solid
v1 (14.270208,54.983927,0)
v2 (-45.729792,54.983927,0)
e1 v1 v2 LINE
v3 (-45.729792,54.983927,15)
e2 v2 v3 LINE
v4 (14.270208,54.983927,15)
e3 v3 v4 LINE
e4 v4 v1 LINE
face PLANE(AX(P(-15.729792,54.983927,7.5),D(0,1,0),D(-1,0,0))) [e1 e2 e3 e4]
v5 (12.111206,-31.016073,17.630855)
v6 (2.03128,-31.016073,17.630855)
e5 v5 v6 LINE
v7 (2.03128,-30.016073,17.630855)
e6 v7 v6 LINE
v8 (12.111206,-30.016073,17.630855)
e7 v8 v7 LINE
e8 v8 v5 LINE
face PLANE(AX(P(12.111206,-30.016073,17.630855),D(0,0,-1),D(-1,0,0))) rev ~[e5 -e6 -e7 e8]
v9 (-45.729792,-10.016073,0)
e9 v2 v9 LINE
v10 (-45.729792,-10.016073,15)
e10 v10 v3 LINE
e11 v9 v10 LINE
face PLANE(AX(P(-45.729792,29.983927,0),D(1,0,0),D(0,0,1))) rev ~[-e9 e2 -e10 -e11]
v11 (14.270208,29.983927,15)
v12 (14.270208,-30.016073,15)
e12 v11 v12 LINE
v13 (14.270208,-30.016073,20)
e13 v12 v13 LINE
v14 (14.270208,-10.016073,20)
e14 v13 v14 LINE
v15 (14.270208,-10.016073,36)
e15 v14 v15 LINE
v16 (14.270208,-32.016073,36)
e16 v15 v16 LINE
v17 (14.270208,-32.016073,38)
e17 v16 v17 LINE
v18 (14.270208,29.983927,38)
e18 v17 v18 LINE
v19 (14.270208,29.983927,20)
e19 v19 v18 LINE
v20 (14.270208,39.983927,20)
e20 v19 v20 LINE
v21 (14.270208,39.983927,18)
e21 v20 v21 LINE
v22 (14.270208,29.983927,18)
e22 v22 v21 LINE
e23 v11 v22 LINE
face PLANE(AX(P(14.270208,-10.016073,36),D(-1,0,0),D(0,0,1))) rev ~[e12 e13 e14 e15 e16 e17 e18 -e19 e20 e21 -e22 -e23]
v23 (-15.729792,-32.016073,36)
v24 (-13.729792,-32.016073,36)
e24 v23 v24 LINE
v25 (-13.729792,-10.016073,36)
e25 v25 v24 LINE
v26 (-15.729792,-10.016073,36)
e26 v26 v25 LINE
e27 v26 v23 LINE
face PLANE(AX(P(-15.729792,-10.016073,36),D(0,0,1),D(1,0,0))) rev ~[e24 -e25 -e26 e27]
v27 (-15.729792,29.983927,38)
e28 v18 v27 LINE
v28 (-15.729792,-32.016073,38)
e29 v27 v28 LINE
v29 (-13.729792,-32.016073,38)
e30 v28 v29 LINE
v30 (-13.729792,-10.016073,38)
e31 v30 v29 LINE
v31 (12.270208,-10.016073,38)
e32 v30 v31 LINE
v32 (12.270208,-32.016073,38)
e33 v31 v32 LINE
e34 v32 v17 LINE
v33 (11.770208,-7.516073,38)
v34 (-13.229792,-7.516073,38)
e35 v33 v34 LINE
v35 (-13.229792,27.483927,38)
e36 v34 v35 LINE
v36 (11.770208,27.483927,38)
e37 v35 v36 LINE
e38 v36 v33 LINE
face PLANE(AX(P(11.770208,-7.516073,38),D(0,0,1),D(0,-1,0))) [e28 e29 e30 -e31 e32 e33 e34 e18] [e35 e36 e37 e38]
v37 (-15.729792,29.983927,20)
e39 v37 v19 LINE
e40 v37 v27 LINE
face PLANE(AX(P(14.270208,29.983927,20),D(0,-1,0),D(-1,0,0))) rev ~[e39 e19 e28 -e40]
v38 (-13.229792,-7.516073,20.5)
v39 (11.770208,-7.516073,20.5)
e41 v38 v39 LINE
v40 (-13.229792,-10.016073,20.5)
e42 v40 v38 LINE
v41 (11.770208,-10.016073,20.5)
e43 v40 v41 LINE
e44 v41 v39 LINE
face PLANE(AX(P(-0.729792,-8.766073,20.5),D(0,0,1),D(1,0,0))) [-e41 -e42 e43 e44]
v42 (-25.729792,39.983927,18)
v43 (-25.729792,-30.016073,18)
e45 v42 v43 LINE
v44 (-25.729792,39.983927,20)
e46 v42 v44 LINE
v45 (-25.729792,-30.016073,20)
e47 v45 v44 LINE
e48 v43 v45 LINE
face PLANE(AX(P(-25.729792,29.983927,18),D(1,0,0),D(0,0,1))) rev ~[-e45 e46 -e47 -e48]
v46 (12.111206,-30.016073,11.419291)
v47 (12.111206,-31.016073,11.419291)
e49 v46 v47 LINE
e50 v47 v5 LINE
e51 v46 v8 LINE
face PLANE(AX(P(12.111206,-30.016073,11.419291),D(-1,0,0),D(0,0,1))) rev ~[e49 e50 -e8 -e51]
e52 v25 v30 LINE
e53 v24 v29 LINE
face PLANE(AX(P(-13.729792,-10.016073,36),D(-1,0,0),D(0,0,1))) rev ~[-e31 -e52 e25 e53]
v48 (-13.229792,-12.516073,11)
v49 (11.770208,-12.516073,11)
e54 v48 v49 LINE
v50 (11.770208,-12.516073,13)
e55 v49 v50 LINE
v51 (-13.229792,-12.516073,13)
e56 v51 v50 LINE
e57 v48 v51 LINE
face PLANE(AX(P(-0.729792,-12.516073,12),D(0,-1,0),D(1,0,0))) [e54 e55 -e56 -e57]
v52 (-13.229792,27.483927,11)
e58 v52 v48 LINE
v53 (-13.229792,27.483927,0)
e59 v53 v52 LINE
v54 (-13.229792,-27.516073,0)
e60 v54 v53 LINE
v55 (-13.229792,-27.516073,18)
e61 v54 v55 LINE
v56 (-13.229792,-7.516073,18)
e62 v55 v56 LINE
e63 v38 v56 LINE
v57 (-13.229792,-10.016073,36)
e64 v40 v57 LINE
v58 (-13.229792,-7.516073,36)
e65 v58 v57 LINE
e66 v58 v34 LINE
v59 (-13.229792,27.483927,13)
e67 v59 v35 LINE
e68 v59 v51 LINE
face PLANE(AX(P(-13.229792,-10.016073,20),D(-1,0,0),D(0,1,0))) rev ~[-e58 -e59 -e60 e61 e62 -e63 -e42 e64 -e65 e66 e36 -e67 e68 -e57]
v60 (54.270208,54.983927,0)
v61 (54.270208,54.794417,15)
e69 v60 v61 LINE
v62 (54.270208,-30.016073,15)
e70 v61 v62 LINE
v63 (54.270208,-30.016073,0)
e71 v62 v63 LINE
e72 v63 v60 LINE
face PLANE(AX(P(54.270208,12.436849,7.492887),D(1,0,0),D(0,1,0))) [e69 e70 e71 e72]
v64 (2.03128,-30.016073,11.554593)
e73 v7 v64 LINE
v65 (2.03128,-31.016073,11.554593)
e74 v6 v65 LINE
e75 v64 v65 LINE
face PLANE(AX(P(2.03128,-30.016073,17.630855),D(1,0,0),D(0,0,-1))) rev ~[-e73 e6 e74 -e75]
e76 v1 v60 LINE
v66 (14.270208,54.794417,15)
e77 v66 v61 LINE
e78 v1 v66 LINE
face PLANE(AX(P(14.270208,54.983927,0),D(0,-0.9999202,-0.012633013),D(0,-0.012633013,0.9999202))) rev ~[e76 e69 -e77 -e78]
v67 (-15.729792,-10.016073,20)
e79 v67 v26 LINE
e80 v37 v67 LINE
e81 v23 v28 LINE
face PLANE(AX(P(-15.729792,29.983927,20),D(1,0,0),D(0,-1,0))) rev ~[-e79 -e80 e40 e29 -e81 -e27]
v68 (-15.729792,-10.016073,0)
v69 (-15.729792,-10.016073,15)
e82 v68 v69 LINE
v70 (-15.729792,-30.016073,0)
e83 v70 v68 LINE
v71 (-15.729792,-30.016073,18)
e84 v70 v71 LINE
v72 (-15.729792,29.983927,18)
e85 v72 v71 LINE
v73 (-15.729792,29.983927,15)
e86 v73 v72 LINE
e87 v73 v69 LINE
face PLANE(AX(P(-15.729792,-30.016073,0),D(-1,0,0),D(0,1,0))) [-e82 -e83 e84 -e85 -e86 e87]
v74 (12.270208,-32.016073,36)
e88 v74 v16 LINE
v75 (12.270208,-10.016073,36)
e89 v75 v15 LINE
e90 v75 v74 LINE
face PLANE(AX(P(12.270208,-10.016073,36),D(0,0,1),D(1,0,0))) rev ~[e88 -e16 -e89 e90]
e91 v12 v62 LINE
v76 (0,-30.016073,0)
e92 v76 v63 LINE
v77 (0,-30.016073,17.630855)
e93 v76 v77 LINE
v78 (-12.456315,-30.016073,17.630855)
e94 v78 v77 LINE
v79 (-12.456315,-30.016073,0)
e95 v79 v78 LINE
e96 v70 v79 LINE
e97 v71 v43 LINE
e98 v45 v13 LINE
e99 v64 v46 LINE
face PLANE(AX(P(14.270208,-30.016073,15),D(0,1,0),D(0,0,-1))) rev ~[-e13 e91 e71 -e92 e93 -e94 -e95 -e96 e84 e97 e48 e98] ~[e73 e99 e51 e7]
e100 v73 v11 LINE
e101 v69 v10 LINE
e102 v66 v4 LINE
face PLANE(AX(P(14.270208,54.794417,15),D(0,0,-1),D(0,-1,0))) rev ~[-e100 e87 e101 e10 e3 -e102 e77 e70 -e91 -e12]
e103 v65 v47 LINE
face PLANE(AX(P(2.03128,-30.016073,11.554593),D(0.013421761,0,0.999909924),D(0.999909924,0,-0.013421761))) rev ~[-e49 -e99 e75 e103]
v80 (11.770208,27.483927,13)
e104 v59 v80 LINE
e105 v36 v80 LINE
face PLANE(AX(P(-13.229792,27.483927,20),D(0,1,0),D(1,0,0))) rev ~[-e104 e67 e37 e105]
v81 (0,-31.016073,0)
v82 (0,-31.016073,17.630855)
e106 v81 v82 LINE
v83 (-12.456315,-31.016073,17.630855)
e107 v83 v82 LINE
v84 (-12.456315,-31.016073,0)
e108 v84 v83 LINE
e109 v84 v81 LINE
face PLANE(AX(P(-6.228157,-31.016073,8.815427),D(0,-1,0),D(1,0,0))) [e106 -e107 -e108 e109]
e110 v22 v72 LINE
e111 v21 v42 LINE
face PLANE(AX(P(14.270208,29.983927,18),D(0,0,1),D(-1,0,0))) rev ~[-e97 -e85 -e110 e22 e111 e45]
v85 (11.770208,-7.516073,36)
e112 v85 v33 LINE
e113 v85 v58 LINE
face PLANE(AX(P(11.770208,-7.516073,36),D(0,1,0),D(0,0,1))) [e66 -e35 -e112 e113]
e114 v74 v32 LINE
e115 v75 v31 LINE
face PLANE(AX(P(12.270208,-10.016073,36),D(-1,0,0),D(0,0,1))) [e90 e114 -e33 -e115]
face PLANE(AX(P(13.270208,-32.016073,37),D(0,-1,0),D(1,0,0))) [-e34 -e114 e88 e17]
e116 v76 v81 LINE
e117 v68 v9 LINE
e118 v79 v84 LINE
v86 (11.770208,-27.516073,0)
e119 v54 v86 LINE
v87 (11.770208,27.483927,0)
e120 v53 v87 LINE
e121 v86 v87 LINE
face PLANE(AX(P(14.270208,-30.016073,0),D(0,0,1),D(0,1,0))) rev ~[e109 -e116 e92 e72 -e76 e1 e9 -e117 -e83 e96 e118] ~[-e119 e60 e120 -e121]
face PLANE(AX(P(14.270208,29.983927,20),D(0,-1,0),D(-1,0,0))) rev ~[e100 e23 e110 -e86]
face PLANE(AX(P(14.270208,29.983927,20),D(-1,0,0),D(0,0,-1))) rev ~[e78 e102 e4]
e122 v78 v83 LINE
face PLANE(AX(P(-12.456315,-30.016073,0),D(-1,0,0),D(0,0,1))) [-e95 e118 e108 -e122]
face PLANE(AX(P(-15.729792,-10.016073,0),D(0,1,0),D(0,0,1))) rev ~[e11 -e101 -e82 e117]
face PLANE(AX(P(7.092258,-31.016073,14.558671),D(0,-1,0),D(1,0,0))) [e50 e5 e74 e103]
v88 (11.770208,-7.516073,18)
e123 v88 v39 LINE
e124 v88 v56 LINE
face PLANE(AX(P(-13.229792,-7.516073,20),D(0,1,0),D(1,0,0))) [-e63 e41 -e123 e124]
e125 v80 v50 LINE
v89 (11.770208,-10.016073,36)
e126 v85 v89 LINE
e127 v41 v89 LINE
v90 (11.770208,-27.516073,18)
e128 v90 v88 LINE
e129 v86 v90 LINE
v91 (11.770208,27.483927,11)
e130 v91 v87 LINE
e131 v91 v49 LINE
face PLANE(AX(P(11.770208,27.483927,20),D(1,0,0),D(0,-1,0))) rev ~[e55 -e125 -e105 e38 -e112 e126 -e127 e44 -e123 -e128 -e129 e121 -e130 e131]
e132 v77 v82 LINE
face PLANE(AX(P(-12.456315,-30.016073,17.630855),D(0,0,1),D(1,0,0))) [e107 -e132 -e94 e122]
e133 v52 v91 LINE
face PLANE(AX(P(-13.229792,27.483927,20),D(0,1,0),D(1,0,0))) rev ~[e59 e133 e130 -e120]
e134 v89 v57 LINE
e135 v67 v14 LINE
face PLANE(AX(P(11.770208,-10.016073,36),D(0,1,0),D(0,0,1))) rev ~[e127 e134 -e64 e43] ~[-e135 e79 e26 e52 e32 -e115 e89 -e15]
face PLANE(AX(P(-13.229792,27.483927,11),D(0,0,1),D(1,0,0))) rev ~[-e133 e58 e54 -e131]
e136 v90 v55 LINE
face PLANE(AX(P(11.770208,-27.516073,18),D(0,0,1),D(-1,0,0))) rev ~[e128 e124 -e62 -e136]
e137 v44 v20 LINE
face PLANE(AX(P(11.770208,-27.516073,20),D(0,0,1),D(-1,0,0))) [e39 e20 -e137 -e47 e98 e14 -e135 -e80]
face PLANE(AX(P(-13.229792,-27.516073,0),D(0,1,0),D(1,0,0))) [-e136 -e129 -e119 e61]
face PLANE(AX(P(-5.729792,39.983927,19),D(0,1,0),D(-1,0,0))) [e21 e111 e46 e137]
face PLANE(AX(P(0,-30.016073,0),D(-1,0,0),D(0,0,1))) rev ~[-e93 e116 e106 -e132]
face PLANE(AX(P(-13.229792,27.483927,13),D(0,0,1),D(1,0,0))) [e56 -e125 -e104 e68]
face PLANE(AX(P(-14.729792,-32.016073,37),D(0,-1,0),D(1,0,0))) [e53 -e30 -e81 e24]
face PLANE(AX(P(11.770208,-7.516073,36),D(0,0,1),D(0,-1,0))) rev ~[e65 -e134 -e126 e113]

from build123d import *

# Parameters (mm, degrees)
F0_W      = 30
F0_H      = 60
F0_W_2    = 25
F0_H_2    = 55
F1_DEPTH  = 20
F2_W      = 40
F2_H      = 15
F3_DEPTH  = 30
F5_W      = 60
F5_H      = 2
F6_DEPTH  = 10
F8_DEPTH  = 18
F10_DEPTH = 25
F12_DEPTH = 10
F13_W     = 25
F13_H     = 2
F14_DEPTH = 20
F15_W     = 25
F15_H     = 2
F16_DEPTH = 40
F18_DEPTH = 40
F4_W      = 12.4563146383
F4_H      = 17.6308546215
F19_DEPTH = 1
F20_W     = 25
F20_H     = 2.5
F21_DEPTH = 0.5
F22_W     = 2
F22_H     = 2
F23_DEPTH = 22
F26_W     = 2.5
F26_H     = 2
F27_DEPTH = 25


# Not quite as in the source:
# - the program builds the solid bodies; features that only make, move or delete a surface that nothing else refers to are left out


with BuildPart() as f1:
    # F0 (on Top) → F1 (new body)
    with BuildSketch(Plane.XY):
        with Locations((-0.72979182, -0.0160729922)):
            Rectangle(F0_W, F0_H)
        with Locations((-0.72979182, -0.0160729922)):
            Rectangle(F0_W_2, F0_H_2, mode=Mode.SUBTRACT)
    extrude(amount=F1_DEPTH)

    # F2 (on face) → F3 (join)
    with BuildSketch(Plane(origin=(-15.72979182, 0, 0), x_dir=(0, -1, 0), z_dir=(-1, 0, 0))):
        with Locations((-9.9839270078, 7.5)):
            Rectangle(F2_W, F2_H)
    extrude(amount=F3_DEPTH)

    # F5 (on face) → F6 (join)
    with BuildSketch(Plane(origin=(-15.72979182, 0, 0), x_dir=(0, -1, 0), z_dir=(-1, 0, 0))):
        with Locations((0.0160729922, 19)):
            Rectangle(F5_W, F5_H)
    extrude(amount=F6_DEPTH)

    # F7 (on face) → F8 (join)
    with BuildSketch(Plane.XY.offset(20)):
        Polygon((14.27020818, -10.0160729922), (14.27020818, 29.9839270078), (-15.72979182, 29.9839270078), (-15.72979182, -10.0160729922), (-13.22979182, -10.0160729922), (-13.22979182, 27.4839270078), (11.77020818, 27.4839270078), (11.77020818, -10.0160729922), align=None)
    extrude(amount=F8_DEPTH)

    # F9 (on face) → F10 (join)
    with BuildSketch(Plane(origin=(0, 29.9839270078, 0), x_dir=(-1, 0, 0), z_dir=(0, 1, 0))):
        Polygon((45.72979182, 0), (45.72979182, 15), (15.72979182, 15), (-14.27020818, 15), (-14.27020818, 0), align=None)
    extrude(amount=F10_DEPTH)

    # F11 (on face) → F12 (join)
    with BuildSketch(Plane(origin=(0, 29.9839270078, 0), x_dir=(-1, 0, 0), z_dir=(0, 1, 0))):
        Polygon((25.72979182, 18), (25.72979182, 20), (15.72979182, 20), (-14.27020818, 20), (-14.27020818, 18), (15.72979182, 18), align=None)
    extrude(amount=F12_DEPTH)

    # F13 (on face) → F14 (join)
    with BuildSketch(Plane(origin=(0, -27.5160729922, 0), x_dir=(-1, 0, 0), z_dir=(0, 1, 0))):
        with Locations((0.72979182, 19)):
            Rectangle(F13_W, F13_H)
    extrude(amount=F14_DEPTH)

    # F15 (on face) → F16 (join)
    with BuildSketch(Plane.XZ.offset(-27.4839270078)):
        with Locations((-0.72979182, 12)):
            Rectangle(F15_W, F15_H)
    extrude(amount=F16_DEPTH)

    # F17 (on face) → F18 (join)
    with BuildSketch(Plane.YZ.offset(14.27020818)):
        Polygon((54.7944166925, 15), (29.9839270078, 15), (-30.0160729922, 15), (-30.0160729922, 0), (54.9839270078, 0), align=None)
    extrude(amount=F18_DEPTH)

    # F4 (on face) → F19 (join)
    with BuildSketch(Plane.XZ.offset(30.0160729922)):
        with Locations((-6.2281573191, 8.8154273108)):
            Rectangle(F4_W, F4_H)
        Polygon((12.1112056077, 11.4192906767), (12.1112056077, 17.6308546215), (2.0312797278, 17.6308546215), (2.0312797278, 11.5545932204), align=None)
    extrude(amount=F19_DEPTH)

    # F20 (on face) → F21 (join)
    with BuildSketch(Plane.XY.offset(20)):
        with Locations((-0.72979182, -8.7660729922)):
            Rectangle(F20_W, F20_H)
    extrude(amount=F21_DEPTH)

    # F22 (on face) → F23 (join)
    with BuildSketch(Plane.XZ.offset(10.0160729922)):
        with Locations((13.27020818, 37)):
            Rectangle(F22_W, F22_H)
        with Locations((-14.72979182, 37)):
            Rectangle(F22_W, F22_H)
    extrude(amount=F23_DEPTH)

    # F26 (on face) → F27 (join)
    with BuildSketch(Plane(origin=(11.77020818, 0, 0), x_dir=(0, -1, 0), z_dir=(-1, 0, 0))):
        with Locations((8.7660729922, 37)):
            Rectangle(F26_W, F26_H)
    extrude(amount=F27_DEPTH)


solid = f1.part
